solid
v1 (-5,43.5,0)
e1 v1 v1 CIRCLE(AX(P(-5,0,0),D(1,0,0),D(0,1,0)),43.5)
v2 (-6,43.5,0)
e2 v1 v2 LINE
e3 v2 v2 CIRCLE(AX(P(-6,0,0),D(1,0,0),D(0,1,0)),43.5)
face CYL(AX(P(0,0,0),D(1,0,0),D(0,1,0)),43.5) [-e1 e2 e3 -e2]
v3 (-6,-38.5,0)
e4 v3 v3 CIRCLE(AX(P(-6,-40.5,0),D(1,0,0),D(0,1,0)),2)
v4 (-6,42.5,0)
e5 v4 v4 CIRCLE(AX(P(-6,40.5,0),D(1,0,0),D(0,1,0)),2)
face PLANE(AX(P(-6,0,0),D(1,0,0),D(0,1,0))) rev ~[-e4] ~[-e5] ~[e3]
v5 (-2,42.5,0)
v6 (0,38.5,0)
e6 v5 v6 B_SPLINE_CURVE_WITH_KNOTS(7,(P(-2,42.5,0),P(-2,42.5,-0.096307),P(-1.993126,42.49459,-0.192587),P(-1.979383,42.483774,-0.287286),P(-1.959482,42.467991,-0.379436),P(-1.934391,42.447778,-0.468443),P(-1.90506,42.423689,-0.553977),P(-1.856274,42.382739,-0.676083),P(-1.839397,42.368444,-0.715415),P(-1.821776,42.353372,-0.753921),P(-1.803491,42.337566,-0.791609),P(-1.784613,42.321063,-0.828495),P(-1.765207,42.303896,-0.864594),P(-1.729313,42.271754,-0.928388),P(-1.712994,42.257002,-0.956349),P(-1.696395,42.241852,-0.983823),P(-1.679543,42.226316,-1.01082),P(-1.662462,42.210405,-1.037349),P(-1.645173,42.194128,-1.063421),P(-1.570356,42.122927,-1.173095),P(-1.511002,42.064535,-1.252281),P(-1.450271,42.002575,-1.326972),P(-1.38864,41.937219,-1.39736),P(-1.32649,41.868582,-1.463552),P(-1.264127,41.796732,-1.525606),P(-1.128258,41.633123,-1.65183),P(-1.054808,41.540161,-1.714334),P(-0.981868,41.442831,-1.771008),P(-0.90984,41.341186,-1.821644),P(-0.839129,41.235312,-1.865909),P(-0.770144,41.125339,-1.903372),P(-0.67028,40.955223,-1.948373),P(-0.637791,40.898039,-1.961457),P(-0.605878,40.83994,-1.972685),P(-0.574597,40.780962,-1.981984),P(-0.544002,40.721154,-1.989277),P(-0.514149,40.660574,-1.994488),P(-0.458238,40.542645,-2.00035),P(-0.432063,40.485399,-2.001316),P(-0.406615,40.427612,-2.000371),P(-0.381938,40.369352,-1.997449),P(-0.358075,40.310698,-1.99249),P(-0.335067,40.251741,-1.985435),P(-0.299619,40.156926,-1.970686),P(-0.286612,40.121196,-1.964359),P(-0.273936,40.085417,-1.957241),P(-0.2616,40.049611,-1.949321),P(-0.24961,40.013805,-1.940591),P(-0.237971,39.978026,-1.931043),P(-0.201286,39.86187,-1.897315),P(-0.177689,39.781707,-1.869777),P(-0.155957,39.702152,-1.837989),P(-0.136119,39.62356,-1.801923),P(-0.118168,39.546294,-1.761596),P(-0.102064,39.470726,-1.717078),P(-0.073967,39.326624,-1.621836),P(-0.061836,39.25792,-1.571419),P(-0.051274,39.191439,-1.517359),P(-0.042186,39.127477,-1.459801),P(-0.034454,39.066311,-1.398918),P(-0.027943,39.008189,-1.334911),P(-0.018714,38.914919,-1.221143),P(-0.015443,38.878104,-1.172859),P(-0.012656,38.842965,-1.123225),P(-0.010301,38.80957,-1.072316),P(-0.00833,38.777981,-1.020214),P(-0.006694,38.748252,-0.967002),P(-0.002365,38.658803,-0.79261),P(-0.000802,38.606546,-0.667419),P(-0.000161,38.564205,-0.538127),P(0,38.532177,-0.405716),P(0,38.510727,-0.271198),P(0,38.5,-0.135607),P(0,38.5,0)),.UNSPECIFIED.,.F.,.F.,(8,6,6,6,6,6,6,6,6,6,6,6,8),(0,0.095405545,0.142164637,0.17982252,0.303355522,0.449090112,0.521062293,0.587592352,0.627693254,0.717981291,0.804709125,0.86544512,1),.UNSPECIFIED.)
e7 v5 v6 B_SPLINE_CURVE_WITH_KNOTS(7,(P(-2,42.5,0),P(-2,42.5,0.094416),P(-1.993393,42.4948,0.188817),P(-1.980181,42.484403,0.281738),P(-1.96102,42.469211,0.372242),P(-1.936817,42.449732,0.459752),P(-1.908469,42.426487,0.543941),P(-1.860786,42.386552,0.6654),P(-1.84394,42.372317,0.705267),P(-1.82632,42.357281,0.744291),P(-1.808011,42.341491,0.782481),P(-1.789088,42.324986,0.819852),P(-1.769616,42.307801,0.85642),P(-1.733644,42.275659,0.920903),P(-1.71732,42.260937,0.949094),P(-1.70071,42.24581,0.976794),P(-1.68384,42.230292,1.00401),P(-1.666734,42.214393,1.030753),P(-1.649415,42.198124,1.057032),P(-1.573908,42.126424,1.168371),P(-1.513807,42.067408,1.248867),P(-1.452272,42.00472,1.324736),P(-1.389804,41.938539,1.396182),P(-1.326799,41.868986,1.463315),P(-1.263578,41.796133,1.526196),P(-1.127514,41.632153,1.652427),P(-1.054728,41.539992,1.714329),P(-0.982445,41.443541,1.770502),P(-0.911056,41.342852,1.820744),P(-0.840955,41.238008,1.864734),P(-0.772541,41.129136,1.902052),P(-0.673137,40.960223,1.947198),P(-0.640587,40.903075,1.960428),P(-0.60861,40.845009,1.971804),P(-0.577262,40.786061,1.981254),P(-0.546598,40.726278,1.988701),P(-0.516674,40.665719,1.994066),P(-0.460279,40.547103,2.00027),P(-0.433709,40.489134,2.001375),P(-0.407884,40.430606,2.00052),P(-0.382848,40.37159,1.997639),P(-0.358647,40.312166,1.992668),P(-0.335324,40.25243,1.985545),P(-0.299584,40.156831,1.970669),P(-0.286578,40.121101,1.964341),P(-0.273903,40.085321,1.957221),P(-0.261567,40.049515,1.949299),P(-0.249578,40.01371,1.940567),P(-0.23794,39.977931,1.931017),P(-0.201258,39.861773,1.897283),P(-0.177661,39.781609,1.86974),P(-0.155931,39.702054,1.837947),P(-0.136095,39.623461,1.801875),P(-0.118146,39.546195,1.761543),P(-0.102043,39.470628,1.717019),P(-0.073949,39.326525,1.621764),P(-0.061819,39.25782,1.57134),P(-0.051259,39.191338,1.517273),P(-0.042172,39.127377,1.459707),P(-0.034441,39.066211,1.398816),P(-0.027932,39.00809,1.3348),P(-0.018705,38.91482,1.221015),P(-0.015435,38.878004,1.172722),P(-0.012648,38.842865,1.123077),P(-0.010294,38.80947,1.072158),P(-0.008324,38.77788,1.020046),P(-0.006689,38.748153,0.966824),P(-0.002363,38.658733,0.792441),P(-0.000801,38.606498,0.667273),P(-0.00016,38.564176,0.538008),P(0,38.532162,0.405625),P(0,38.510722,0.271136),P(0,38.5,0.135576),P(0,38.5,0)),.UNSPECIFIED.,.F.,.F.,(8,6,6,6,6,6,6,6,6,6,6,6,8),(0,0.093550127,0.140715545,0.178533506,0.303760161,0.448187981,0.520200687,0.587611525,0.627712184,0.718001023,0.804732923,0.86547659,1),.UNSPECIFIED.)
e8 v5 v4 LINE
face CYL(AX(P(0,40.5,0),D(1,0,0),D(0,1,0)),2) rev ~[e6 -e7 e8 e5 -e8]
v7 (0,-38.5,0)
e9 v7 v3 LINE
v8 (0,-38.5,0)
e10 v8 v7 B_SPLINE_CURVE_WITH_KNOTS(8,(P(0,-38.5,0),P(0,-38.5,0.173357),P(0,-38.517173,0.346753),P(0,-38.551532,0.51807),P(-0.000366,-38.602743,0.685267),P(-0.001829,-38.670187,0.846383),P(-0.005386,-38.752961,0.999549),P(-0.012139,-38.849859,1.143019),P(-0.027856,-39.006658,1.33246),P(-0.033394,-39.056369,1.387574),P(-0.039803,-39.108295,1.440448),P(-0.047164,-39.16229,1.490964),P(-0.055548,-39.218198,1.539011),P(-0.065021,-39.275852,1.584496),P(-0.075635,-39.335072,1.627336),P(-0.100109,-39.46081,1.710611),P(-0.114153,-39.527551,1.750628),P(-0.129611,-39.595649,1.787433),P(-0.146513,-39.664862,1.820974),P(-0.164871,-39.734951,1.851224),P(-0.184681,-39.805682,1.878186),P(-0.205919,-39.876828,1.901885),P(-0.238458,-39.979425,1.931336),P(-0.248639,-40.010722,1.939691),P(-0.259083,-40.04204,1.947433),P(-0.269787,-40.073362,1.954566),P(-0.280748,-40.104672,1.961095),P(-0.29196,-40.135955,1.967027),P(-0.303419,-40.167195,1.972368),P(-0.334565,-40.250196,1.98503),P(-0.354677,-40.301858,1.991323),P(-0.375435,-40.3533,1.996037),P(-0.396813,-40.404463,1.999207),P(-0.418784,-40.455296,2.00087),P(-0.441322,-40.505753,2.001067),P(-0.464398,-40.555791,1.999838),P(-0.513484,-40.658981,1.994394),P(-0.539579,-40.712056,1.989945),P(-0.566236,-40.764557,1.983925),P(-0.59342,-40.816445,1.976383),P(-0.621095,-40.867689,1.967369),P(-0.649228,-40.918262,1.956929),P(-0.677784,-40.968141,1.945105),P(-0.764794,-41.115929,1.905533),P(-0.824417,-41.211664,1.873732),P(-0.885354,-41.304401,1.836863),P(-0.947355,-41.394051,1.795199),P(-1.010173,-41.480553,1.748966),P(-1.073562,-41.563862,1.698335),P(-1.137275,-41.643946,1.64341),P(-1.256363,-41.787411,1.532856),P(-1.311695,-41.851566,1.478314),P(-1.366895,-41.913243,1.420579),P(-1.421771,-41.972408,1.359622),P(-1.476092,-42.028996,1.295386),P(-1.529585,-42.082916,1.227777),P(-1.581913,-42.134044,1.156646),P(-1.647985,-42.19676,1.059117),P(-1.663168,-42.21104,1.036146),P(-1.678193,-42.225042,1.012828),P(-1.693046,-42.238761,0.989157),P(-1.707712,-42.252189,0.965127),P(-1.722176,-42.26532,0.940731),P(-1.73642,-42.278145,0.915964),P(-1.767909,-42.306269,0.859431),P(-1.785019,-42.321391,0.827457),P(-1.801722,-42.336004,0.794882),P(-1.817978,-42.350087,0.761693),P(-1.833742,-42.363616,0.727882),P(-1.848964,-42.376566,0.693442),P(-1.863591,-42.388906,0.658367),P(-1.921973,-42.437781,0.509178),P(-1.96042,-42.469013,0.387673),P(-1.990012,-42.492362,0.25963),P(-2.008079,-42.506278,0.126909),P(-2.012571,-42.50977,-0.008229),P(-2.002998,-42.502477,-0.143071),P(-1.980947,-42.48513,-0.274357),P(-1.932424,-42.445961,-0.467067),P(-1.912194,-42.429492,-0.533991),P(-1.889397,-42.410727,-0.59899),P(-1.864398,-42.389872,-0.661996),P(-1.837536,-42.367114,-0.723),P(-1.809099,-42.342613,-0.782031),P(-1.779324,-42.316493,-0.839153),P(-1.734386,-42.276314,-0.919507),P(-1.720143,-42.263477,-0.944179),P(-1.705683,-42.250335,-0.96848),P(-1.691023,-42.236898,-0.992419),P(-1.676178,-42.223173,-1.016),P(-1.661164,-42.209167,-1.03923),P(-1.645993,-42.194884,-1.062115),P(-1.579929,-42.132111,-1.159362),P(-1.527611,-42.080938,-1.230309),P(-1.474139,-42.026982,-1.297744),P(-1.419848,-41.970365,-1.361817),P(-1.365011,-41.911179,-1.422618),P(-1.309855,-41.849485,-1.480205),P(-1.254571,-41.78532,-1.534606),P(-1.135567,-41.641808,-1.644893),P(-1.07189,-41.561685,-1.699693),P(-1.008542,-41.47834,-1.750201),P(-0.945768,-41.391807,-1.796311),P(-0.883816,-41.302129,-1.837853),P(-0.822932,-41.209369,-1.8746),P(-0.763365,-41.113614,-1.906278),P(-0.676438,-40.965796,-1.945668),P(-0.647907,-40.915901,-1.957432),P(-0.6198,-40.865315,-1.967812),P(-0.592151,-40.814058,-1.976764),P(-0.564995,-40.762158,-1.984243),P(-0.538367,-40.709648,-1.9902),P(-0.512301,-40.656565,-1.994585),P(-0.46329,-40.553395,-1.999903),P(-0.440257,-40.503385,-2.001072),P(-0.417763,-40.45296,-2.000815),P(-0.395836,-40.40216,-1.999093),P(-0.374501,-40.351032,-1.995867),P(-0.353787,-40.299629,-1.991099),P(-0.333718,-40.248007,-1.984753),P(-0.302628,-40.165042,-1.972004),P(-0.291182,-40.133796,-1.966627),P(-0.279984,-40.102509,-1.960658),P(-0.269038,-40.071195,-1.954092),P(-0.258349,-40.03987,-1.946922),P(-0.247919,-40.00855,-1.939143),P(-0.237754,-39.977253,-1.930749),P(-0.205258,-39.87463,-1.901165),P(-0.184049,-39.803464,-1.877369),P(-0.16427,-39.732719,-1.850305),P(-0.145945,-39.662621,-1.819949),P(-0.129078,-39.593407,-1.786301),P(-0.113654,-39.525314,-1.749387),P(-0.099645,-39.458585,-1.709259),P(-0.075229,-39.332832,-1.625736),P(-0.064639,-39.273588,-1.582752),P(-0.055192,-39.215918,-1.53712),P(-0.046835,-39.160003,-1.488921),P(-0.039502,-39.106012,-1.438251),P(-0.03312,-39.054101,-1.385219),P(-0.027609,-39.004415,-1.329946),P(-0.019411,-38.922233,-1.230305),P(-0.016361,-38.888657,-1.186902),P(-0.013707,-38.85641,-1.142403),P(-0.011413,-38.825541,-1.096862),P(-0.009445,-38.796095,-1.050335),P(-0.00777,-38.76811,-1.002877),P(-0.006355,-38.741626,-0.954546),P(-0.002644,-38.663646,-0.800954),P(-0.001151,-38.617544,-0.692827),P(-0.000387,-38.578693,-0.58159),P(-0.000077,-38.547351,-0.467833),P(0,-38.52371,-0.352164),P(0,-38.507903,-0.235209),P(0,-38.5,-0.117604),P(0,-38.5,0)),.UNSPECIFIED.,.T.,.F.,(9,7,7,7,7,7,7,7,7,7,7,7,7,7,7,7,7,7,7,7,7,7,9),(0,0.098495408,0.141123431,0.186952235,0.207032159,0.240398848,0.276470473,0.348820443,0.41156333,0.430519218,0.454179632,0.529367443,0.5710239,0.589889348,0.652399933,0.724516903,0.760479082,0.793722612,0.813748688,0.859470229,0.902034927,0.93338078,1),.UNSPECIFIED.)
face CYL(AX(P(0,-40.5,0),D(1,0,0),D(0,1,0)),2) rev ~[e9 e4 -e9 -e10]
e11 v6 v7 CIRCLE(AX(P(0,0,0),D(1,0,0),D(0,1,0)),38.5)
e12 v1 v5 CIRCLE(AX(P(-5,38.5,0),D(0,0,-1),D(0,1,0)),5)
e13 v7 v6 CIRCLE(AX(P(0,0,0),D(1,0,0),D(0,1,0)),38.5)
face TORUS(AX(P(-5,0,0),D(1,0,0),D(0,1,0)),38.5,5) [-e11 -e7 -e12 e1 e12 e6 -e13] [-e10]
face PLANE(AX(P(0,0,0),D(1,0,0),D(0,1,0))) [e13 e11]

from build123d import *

# Parameters (mm, degrees)
F0_R     = 43.5
F0_R_2   = 2
F1_DEPTH = 6


# Not quite as in the source:
# - a fillet or chamfer that OpenCascade refuses, or shapes differently, is made with other operations: its cross-section is extruded or revolved along the edge and cut away or added


with BuildPart() as f1:
    # F0 (on Right) → F1 (new body)
    with BuildSketch(Plane.YZ):
        Circle(F0_R)
        with Locations((-40.5, 0)):
            Circle(F0_R_2, mode=Mode.SUBTRACT)
        with Locations((40.5, 0)):
            Circle(F0_R_2, mode=Mode.SUBTRACT)
    extrude(amount=-F1_DEPTH)

    # F2: fillet of radius 5 on 1 edges, made by hand

    # F2_s1 → F2_t2 (revolve, cut)
    with BuildSketch(Plane.XY):
        with BuildLine():
            ThreePointArc((-5, 43.5), (-1.4644660941, 42.0355339059), (0, 38.5))
            Line((0, 38.5), (0, 43.5))
            Line((0, 43.5), (-5, 43.5))
        make_face()
    revolve(axis=Axis((0, 0, 0), (1, 0, 0)), mode=Mode.SUBTRACT)


solid = f1.part
